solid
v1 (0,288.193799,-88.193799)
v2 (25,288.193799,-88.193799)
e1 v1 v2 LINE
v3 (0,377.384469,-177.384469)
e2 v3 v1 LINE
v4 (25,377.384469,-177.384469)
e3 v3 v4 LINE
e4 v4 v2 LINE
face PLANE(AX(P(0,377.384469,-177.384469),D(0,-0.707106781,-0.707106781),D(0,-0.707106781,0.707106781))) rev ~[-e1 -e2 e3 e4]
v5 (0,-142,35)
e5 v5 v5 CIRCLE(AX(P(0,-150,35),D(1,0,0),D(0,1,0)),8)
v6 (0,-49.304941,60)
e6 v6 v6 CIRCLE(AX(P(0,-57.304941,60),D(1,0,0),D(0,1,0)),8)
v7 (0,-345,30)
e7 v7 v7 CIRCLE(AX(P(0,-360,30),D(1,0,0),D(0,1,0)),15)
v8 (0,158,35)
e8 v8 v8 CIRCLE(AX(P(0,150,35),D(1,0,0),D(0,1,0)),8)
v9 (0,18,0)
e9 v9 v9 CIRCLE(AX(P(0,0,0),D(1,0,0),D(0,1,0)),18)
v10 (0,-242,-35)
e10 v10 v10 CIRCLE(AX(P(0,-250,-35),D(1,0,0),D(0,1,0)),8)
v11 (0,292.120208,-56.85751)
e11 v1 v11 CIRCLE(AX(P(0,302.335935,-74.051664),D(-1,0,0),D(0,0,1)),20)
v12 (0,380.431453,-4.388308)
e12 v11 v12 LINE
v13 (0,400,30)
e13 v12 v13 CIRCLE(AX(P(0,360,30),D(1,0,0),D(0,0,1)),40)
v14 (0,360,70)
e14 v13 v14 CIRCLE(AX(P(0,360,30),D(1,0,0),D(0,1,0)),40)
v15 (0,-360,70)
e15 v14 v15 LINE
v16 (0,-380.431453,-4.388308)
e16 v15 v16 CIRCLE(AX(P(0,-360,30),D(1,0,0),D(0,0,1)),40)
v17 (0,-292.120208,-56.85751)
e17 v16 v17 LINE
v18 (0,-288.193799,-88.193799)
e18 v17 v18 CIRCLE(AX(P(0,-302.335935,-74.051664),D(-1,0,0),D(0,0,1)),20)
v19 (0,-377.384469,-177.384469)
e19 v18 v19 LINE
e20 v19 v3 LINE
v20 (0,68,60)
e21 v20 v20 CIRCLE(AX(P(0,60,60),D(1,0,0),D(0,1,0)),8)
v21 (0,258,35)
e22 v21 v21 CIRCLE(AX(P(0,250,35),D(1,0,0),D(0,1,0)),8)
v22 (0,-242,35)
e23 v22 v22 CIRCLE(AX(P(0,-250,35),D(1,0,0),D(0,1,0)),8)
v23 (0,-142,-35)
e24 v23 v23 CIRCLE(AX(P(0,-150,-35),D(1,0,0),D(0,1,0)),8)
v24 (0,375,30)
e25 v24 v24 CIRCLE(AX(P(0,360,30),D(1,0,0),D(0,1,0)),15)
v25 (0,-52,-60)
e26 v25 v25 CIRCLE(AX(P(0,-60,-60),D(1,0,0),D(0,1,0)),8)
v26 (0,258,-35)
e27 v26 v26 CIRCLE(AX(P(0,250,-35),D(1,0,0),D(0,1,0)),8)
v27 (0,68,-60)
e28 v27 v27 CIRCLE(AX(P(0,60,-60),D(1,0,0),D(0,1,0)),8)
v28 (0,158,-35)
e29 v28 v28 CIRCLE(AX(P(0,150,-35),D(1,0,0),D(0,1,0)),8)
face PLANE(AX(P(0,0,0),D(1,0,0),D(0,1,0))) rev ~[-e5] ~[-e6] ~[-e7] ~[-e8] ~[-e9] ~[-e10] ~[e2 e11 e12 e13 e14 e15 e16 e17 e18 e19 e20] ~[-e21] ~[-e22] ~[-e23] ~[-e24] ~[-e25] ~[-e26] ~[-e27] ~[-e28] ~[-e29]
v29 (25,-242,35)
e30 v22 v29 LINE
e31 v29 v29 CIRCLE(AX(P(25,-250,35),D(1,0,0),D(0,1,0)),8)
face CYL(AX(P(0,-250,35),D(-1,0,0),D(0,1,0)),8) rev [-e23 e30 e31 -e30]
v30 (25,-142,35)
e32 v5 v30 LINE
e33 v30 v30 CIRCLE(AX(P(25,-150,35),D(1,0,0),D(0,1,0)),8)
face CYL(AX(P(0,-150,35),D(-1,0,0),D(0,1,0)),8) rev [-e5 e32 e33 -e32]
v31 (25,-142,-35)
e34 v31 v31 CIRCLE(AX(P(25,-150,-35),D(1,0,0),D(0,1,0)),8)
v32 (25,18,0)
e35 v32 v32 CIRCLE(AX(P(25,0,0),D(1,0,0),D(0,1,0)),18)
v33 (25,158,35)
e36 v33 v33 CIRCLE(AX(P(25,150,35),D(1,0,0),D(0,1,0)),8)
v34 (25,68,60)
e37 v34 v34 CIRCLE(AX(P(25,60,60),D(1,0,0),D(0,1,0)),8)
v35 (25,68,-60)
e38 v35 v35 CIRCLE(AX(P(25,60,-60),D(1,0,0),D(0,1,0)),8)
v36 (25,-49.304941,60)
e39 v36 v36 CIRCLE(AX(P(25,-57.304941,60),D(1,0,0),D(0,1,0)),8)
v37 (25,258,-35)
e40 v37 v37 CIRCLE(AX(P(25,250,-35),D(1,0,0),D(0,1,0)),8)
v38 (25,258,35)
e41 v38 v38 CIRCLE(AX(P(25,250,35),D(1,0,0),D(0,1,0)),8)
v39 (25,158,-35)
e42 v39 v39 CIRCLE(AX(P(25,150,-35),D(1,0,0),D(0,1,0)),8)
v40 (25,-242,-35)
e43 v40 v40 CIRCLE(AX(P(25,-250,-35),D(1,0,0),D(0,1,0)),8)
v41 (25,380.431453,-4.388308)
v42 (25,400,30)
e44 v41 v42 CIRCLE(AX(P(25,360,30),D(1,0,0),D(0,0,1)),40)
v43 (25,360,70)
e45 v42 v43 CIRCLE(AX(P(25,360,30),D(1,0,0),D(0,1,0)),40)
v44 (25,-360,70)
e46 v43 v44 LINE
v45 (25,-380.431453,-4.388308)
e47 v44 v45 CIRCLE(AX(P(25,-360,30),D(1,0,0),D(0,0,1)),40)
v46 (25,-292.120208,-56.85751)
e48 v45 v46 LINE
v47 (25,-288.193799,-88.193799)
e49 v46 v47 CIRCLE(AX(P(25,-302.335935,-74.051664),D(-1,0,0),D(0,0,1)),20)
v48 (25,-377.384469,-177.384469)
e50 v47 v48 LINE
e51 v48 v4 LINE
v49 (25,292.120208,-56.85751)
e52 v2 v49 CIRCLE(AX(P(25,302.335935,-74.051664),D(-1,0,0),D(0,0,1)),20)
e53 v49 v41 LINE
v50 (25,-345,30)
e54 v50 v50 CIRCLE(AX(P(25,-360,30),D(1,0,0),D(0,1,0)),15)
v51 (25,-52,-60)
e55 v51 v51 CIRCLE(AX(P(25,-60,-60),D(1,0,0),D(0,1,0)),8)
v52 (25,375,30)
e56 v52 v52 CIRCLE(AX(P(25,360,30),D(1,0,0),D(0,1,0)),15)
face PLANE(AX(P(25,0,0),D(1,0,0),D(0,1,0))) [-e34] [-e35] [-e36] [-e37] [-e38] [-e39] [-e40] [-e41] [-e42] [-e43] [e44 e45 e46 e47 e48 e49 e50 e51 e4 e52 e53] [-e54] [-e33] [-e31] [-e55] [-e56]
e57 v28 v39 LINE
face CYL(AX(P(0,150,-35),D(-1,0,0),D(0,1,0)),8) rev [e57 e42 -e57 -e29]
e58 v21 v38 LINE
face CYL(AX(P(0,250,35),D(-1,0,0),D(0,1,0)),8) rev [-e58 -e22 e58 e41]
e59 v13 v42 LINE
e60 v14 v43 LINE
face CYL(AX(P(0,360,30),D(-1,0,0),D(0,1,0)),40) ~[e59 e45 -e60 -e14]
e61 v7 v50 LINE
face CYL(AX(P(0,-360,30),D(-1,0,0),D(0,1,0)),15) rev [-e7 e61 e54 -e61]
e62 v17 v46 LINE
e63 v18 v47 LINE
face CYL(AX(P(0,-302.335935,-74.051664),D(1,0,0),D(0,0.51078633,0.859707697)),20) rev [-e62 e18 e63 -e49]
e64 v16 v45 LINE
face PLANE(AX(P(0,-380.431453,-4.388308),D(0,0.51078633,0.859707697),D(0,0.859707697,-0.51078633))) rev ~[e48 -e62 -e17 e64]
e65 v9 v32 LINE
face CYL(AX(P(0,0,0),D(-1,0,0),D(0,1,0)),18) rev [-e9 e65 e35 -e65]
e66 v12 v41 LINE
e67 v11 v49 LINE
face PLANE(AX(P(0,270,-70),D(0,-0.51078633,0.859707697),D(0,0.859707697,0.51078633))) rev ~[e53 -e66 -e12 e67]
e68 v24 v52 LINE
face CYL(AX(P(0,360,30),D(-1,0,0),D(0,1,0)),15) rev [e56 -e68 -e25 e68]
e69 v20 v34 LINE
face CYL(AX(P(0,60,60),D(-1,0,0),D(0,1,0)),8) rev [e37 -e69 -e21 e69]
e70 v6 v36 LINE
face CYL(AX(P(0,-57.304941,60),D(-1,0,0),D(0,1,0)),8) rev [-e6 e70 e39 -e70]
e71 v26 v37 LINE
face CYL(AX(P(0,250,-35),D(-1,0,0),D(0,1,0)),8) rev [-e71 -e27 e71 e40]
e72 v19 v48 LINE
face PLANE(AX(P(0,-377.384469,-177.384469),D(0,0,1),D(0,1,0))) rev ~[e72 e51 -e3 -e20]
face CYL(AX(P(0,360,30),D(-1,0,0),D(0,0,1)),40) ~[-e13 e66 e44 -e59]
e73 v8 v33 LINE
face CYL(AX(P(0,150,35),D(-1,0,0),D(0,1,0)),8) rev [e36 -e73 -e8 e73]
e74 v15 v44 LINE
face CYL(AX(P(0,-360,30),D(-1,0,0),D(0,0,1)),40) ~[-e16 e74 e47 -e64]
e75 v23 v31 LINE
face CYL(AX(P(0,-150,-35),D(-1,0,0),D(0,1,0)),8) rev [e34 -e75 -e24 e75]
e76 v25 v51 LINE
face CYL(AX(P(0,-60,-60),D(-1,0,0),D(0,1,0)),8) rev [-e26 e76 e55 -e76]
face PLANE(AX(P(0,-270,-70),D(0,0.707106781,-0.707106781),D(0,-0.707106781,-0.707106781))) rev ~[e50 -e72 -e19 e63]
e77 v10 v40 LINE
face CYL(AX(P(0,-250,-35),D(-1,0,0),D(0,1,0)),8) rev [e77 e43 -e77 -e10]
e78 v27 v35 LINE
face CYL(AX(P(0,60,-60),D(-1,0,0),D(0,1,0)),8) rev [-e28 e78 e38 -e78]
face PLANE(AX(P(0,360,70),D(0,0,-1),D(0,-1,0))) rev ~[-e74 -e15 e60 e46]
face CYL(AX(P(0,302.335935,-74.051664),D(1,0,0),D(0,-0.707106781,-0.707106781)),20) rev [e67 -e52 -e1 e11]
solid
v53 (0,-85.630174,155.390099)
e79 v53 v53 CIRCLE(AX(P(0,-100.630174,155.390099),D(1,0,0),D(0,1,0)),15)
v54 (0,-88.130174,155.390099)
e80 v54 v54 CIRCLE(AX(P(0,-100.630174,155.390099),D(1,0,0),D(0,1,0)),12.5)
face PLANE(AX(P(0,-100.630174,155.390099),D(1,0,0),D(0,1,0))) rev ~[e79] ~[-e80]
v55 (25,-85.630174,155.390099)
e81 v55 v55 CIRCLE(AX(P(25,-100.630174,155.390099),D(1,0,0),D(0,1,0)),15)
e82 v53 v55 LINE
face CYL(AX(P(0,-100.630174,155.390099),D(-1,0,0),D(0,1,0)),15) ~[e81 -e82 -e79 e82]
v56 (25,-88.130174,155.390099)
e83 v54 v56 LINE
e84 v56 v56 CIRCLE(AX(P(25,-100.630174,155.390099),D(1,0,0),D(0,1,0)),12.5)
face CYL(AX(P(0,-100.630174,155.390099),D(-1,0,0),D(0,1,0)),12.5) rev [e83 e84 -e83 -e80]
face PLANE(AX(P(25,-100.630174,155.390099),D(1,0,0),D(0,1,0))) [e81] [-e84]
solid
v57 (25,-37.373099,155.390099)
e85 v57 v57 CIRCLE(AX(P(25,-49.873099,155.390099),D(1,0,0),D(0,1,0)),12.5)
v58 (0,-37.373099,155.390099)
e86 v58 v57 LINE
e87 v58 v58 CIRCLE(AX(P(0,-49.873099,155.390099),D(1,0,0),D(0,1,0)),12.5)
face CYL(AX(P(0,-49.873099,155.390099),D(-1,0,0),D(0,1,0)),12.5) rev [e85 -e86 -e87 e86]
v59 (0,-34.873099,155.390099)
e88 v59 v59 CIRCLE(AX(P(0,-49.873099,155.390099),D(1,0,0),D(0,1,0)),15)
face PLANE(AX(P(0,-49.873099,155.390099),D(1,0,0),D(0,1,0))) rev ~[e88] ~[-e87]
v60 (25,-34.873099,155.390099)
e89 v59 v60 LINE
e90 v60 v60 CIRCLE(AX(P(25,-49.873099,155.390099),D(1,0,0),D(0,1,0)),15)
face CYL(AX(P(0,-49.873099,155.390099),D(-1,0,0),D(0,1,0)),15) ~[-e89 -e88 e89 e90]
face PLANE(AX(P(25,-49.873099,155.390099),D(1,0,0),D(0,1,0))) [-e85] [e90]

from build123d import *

# Parameters (mm, degrees)
F0_W     = 540
F0_H     = 140
F0_R     = 8
F0_R_2   = 18
F0_R_3   = 15
F1_DEPTH = 25
F2_R     = 15
F2_R_2   = 12.5
F3_DEPTH = 25
F6_R     = 20


# Not quite as in the source:
# - a feature names something its author has since deleted; it is built from what else it names


with BuildPart() as f1:
    # F0 (on Right) → F1 (new body)
    with BuildSketch(Plane.YZ):
        Rectangle(F0_W, F0_H)
        with Locations((-60, -60)):
            Circle(F0_R, mode=Mode.SUBTRACT)
        with Locations((60, -60)):
            Circle(F0_R, mode=Mode.SUBTRACT)
        with Locations((-250, -35)):
            Circle(F0_R, mode=Mode.SUBTRACT)
        with Locations((-150, -35)):
            Circle(F0_R, mode=Mode.SUBTRACT)
        with Locations((-250, 35)):
            Circle(F0_R, mode=Mode.SUBTRACT)
        with Locations((-150, 35)):
            Circle(F0_R, mode=Mode.SUBTRACT)
        with Locations((-57.3049411178, 60)):
            Circle(F0_R, mode=Mode.SUBTRACT)
        with Locations((150, -35)):
            Circle(F0_R, mode=Mode.SUBTRACT)
        Circle(F0_R_2, mode=Mode.SUBTRACT)
        with Locations((250, -35)):
            Circle(F0_R, mode=Mode.SUBTRACT)
        with Locations((150, 35)):
            Circle(F0_R, mode=Mode.SUBTRACT)
        with Locations((60, 60)):
            Circle(F0_R, mode=Mode.SUBTRACT)
        with Locations((250, 35)):
            Circle(F0_R, mode=Mode.SUBTRACT)
        with BuildLine():
            Line((-270, -70), (-270, 70))
            Line((-270, 70), (-360, 70))
            ThreePointArc((-360, 70), (-331.7157287525, 58.2842712475), (-320, 30))
            ThreePointArc((-320, 30), (-340.2169027766, -4.7653428611), (-380.4314532125, -4.3883078913))
            Line((-380.4314532125, -4.3883078913), (-270, -70))
        make_face()
        with BuildLine():
            Line((360, 70), (270, 70))
            Line((270, 70), (270, -70))
            Line((270, -70), (380.4314532125, -4.3883078913))
            ThreePointArc((380.4314532125, -4.3883078913), (321.4284281131, 19.4059525122), (360, 70))
        make_face()
        with BuildLine():
            ThreePointArc((-320, 30), (-331.7157287525, 58.2842712475), (-360, 70))
            ThreePointArc((-360, 70), (-398.5715718869, 40.5940474878), (-380.4314532125, -4.3883078913))
            ThreePointArc((-380.4314532125, -4.3883078913), (-340.2169027766, -4.7653428611), (-320, 30))
        make_face()
        with Locations((-360, 30)):
            Circle(F0_R_3, mode=Mode.SUBTRACT)
        with BuildLine():
            ThreePointArc((400, 30), (388.2842712475, 58.2842712475), (360, 70))
            ThreePointArc((360, 70), (321.4284281131, 19.4059525122), (380.4314532125, -4.3883078913))
            ThreePointArc((380.4314532125, -4.3883078913), (394.7653428611, 10.2169027766), (400, 30))
        make_face()
        with Locations((360, 30)):
            Circle(F0_R_3, mode=Mode.SUBTRACT)
        Polygon((270, -70), (-270, -70), (-377.3844690551, -177.3844690551), (377.3844690551, -177.3844690551), align=None)
    extrude(amount=F1_DEPTH)

    # F6
    f6_edges = [f1.edges().sort_by_distance(p)[0] for p in [
        (12.5, -270, -70),
        (12.5, 270, -70),
    ]]
    fillet(f6_edges, radius=F6_R)


with BuildPart() as f3:
    # F2 (on Right) → F3 (new body)
    with BuildSketch(Plane.YZ):
        with Locations((-213.5602489911, 155.390098691)):
            Circle(F2_R)
        with Locations((-213.5602489911, 155.390098691)):
            Circle(F2_R_2, mode=Mode.SUBTRACT)
    extrude(amount=F3_DEPTH)


with BuildPart() as f3b:
    # F2 (on Right) → F3, piece 2 (new body)
    with BuildSketch(Plane.YZ):
        with Locations((-154.9366889584, 155.390098691)):
            Circle(F2_R)
        with Locations((-154.9366889584, 155.390098691)):
            Circle(F2_R_2, mode=Mode.SUBTRACT)
    extrude(amount=F3_DEPTH)


with BuildPart() as f3c:
    # F2 (on Right) → F3, piece 3 (new body)
    with BuildSketch(Plane.YZ):
        with Locations((-100.630173799, 155.390098691)):
            Circle(F2_R)
        with Locations((-100.630173799, 155.390098691)):
            Circle(F2_R_2, mode=Mode.SUBTRACT)
    extrude(amount=F3_DEPTH)


with BuildPart() as f3d:
    # F2 (on Right) → F3, piece 4 (new body)
    with BuildSketch(Plane.YZ):
        with Locations((-49.8730993964, 155.390098691)):
            Circle(F2_R)
        with Locations((-49.8730993964, 155.390098691)):
            Circle(F2_R_2, mode=Mode.SUBTRACT)
    extrude(amount=F3_DEPTH)


solid = Compound([f1.part, f3c.part, f3d.part])
